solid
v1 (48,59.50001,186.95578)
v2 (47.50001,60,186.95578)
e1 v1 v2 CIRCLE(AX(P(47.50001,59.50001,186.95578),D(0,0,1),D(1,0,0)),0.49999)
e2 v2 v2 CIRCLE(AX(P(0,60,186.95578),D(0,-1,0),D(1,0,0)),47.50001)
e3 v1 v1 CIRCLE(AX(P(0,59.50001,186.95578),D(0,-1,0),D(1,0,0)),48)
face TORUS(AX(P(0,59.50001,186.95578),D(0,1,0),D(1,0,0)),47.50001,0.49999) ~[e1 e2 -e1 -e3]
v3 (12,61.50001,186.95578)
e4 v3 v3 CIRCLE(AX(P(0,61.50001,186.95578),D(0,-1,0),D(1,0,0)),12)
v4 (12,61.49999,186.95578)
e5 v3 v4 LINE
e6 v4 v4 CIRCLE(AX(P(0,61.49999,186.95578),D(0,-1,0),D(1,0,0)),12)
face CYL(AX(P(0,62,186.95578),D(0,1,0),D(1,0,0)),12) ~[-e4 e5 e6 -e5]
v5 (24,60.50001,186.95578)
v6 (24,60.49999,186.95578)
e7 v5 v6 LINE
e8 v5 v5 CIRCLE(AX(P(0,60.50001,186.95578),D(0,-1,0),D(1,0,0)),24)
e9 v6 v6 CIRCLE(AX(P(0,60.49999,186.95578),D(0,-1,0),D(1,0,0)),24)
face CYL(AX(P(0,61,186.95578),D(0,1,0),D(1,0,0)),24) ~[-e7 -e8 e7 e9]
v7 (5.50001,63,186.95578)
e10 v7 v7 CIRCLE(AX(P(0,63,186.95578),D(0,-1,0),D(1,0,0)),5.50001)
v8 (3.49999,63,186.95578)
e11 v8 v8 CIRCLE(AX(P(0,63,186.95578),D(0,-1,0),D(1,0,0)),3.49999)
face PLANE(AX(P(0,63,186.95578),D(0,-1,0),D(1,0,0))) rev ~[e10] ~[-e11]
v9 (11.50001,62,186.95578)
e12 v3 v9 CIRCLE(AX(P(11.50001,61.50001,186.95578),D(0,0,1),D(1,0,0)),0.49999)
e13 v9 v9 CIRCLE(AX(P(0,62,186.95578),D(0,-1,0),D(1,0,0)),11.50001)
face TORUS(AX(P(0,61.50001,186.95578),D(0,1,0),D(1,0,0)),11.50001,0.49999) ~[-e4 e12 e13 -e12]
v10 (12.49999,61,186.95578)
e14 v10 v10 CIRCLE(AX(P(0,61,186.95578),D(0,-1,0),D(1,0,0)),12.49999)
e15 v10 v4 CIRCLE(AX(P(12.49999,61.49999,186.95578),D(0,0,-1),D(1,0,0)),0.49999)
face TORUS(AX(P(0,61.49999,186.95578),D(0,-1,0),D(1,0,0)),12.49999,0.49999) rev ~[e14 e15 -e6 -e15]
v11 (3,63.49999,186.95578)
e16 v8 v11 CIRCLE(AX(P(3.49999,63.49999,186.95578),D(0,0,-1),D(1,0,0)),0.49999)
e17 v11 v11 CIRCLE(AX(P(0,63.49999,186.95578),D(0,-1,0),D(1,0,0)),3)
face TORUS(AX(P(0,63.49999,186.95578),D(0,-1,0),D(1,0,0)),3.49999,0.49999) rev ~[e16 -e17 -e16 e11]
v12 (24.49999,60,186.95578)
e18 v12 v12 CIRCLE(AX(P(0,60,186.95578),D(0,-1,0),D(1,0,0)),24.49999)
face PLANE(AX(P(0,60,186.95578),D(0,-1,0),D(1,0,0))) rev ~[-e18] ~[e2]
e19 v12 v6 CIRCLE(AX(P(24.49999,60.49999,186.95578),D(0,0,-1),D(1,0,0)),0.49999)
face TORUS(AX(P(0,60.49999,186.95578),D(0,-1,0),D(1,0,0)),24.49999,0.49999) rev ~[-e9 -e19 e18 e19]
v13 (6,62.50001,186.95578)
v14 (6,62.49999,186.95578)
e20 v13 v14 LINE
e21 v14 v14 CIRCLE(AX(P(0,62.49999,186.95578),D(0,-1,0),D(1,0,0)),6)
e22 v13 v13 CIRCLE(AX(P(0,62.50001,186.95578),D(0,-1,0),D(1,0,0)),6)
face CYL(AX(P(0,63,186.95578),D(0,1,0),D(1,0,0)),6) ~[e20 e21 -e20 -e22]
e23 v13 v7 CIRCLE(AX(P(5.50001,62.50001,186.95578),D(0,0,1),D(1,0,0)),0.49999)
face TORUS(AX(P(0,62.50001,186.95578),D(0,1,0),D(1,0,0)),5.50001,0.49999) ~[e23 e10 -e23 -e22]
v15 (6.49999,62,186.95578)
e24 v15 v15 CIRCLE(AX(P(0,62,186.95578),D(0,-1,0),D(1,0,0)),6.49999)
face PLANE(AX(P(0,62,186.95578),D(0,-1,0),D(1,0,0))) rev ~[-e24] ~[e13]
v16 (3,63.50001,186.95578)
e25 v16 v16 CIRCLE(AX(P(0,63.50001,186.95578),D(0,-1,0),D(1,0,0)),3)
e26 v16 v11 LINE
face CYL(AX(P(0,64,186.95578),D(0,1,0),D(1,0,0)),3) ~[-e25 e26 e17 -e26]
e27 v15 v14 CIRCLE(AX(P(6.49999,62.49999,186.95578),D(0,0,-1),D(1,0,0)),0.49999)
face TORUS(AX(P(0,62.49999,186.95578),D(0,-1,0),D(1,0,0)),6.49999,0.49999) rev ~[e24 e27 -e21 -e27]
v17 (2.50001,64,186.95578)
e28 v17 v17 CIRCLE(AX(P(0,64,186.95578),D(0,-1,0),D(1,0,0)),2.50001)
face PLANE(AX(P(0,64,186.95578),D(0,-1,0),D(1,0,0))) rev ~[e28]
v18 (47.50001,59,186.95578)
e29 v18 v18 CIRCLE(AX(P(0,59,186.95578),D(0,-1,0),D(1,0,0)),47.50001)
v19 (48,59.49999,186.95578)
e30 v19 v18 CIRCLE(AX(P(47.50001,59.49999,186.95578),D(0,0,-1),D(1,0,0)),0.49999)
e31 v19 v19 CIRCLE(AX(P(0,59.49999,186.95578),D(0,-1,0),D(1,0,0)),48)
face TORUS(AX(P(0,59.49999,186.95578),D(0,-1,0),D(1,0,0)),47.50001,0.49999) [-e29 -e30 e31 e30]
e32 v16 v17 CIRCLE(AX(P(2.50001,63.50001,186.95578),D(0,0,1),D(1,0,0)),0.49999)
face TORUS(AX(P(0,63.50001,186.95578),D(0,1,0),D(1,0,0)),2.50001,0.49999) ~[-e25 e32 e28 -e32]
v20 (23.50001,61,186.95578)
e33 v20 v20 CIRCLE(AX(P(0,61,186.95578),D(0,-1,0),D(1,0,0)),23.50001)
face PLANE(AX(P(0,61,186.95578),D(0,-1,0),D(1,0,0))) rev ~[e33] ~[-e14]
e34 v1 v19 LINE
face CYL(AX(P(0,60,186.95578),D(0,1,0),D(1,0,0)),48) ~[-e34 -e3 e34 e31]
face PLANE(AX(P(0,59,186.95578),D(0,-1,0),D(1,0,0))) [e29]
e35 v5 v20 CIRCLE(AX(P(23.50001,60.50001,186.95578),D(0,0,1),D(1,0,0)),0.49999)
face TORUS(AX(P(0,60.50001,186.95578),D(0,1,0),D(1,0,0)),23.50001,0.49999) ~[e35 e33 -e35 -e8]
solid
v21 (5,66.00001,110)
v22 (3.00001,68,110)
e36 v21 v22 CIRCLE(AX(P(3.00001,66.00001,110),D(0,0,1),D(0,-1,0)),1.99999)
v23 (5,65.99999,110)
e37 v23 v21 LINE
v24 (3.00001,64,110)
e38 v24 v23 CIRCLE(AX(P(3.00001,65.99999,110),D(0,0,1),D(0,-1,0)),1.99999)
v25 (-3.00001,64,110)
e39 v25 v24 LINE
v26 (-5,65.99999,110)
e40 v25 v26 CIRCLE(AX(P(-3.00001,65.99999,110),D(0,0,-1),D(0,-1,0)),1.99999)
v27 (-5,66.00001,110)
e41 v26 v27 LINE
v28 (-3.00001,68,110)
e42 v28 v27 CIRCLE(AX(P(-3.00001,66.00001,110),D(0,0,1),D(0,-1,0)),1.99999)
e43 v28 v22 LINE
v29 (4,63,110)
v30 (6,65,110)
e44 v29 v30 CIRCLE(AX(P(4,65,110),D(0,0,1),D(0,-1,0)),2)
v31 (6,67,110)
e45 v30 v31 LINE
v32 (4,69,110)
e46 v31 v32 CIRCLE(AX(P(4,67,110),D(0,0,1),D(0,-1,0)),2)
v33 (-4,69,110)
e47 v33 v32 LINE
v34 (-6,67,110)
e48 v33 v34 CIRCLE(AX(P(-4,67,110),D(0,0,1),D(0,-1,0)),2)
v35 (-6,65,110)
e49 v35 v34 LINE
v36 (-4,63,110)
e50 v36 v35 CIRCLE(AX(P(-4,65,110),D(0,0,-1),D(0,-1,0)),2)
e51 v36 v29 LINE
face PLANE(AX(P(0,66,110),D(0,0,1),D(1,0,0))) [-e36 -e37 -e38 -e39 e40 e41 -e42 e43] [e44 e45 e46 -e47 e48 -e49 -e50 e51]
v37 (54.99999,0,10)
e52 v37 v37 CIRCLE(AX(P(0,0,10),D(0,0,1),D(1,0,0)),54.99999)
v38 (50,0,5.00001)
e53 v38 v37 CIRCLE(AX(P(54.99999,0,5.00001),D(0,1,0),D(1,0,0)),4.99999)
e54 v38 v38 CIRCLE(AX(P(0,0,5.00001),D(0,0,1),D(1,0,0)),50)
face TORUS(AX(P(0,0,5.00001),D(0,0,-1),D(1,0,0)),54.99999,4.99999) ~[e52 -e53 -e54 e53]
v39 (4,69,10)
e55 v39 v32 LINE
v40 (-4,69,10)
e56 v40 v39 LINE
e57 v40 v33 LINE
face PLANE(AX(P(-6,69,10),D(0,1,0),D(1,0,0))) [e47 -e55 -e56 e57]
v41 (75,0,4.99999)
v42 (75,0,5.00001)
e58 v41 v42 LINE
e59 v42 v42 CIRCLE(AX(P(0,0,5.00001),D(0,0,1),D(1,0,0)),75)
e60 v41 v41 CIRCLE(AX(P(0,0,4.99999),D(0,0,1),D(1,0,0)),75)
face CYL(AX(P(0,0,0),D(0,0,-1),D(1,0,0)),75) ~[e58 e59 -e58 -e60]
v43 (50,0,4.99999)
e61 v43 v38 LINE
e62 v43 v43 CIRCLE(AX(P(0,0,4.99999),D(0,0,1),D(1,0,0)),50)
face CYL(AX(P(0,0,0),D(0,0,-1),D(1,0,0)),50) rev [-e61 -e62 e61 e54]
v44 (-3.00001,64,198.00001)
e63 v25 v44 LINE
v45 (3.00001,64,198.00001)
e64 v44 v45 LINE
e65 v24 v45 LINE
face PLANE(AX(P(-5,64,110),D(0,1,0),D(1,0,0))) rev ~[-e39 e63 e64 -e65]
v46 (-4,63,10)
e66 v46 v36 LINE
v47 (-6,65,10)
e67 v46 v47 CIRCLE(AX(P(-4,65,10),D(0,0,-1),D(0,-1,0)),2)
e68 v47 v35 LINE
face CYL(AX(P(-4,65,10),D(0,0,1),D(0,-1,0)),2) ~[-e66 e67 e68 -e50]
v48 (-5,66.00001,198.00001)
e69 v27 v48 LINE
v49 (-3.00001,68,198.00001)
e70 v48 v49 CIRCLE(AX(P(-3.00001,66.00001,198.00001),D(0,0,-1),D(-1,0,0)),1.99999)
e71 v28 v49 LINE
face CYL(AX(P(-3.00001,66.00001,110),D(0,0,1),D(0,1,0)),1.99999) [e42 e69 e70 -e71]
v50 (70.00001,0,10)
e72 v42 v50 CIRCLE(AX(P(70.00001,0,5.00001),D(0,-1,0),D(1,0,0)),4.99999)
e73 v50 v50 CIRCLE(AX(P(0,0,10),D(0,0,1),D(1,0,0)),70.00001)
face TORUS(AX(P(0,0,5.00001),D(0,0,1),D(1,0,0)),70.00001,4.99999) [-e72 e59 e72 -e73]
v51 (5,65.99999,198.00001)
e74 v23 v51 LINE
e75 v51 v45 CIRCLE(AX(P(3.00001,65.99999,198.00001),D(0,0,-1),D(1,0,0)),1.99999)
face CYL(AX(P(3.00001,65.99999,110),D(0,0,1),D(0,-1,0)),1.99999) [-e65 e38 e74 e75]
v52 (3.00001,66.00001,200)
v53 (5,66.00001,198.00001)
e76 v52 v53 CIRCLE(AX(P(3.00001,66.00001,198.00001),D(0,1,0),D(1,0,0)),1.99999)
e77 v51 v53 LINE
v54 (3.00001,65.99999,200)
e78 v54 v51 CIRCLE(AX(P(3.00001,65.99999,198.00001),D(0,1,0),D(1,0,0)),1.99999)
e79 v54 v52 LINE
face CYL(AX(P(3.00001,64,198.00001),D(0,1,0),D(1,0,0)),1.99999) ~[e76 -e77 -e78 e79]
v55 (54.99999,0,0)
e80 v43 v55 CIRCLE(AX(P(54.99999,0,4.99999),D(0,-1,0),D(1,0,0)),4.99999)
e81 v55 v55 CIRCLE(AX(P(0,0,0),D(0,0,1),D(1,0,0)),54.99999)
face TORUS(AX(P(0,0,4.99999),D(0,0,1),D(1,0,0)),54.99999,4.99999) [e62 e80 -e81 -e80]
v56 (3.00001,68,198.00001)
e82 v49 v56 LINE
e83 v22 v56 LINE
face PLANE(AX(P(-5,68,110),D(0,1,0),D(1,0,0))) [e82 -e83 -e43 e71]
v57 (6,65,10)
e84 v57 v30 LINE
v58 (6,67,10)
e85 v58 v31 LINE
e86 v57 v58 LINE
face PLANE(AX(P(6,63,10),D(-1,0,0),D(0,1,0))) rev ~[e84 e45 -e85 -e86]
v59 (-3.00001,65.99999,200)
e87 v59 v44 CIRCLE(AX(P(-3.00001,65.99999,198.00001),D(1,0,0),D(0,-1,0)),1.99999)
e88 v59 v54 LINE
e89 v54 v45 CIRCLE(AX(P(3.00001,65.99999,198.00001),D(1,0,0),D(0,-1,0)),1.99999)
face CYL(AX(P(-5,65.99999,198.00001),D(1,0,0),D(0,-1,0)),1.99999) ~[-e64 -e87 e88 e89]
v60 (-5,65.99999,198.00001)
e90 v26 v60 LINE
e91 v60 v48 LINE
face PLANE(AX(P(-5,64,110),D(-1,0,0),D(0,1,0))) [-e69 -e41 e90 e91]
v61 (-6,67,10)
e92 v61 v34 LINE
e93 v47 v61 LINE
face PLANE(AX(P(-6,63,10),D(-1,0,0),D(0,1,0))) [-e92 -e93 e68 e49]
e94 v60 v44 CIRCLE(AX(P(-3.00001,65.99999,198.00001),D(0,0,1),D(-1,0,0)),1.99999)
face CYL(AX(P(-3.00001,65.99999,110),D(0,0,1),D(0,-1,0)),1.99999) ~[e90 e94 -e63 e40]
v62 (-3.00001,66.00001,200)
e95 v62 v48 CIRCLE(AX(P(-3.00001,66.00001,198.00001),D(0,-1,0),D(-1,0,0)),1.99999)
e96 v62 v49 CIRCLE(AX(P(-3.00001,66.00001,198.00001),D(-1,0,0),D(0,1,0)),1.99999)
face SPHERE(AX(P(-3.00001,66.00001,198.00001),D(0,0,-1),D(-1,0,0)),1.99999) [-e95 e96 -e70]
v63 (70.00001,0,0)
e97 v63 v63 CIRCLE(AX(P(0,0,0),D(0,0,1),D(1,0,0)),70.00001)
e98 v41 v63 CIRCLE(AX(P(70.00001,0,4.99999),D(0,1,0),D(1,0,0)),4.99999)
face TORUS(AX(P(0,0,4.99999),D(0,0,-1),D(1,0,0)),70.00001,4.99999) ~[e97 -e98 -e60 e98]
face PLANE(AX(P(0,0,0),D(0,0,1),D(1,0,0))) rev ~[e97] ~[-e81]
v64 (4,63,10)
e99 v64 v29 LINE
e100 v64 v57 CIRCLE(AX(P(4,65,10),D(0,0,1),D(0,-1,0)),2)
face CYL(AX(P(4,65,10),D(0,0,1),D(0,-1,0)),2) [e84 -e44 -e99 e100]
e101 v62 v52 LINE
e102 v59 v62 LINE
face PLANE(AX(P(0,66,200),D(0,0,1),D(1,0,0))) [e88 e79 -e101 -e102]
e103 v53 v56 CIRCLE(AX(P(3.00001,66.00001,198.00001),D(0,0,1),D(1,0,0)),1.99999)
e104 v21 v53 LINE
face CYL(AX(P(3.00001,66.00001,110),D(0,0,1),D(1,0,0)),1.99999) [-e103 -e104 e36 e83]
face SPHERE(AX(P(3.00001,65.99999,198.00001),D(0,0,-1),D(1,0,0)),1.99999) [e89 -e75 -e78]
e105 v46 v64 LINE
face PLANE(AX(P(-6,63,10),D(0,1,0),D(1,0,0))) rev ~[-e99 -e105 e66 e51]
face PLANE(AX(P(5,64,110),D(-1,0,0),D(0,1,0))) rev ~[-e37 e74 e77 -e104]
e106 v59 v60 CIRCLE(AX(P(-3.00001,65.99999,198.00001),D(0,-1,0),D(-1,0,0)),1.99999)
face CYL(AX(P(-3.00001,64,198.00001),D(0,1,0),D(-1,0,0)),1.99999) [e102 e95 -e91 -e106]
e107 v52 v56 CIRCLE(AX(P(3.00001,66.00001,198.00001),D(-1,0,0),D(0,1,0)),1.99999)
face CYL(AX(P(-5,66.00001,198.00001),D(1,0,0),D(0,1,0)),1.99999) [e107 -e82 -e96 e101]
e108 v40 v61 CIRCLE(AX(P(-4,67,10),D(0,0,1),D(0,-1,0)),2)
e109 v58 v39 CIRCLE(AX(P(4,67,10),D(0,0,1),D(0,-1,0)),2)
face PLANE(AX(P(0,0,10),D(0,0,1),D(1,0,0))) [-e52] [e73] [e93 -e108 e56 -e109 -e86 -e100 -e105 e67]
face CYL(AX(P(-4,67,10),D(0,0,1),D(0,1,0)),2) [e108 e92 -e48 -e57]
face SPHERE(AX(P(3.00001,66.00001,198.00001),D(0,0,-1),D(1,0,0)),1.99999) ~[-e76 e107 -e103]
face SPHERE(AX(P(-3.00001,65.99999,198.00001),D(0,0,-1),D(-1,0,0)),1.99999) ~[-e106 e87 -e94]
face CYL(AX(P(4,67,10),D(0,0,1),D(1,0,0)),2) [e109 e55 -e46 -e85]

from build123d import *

# Parameters (mm, degrees)
F0_R      = 75
F0_R_2    = 50
F1_DEPTH  = 10
F2_R      = 4.99999
F3_W      = 12
F3_H      = 6
F4_DEPTH  = 100
F5_R      = 2
F6_W      = 10
F6_H      = 4
F7_DEPTH  = 90
F8_R      = 1.99999
F10_DEPTH = 1
F11_R     = 6
F12_DEPTH = 1
F13_R     = 12
F14_DEPTH = 1
F15_R     = 24
F16_DEPTH = 1
F17_R     = 48
F18_DEPTH = 1
F19_R     = 0.49999


# Not quite as in the source:
# - a fillet or chamfer is up to 0.001 mm smaller than in the source, because OpenCascade refuses the exact size


with BuildPart() as f1:
    # F0 (on Top) → F1 (new body)
    with BuildSketch(Plane.XY):
        Circle(F0_R)
        Circle(F0_R_2, mode=Mode.SUBTRACT)
    extrude(amount=F1_DEPTH)

    # F2 (radius 5 in the source; OpenCascade refuses exactly that, so slightly less here)
    f2_edges = [f1.edges().sort_by_distance(p)[0] for p in [
        (-75, 0, 10),
        (-50, 0, 10),
        (-75, 0, 0),
        (-50, 0, 0),
    ]]
    fillet(f2_edges, radius=F2_R)

    # F3 (on face) → F4 (join)
    with BuildSketch(Plane.XY.offset(10)):
        with Locations((0, 66)):
            Rectangle(F3_W, F3_H)
    extrude(amount=F4_DEPTH)

    # F5
    f5_edges = [f1.edges().sort_by_distance(p)[0] for p in [
        (6, 69, 60),
        (6, 63, 60),
        (-6, 69, 60),
        (-6, 63, 60),
    ]]
    fillet(f5_edges, radius=F5_R)

    # F6 (on face) → F7 (join)
    with BuildSketch(Plane.XY.offset(110)):
        with Locations((0, 66)):
            Rectangle(F6_W, F6_H)
    extrude(amount=F7_DEPTH)

    # F8 (radius 2 in the source; OpenCascade refuses exactly that, so slightly less here)
    f8_edges = [f1.edges().sort_by_distance(p)[0] for p in [
        (5, 64, 155),
        (5, 68, 155),
        (-5, 68, 155),
        (-5, 64, 155),
        (-5, 66, 200),
        (5, 66, 200),
        (0, 68, 200),
        (0, 64, 200),
    ]]
    fillet(f8_edges, radius=F8_R)


with BuildPart() as f10:
    # F9 (on face) → F10 (new body)
    with BuildSketch(Plane.XZ.offset(-64)):
        with BuildLine():
            ThreePointArc((-3, 186.9557797909), (0, 183.9557797909), (3, 186.9557797909))
            ThreePointArc((3, 186.9557797909), (0, 189.9557797909), (-3, 186.9557797909))
        make_face()
    extrude(amount=F10_DEPTH)

    # F11 (on face) → F12 (join)
    with BuildSketch(Plane.XZ.offset(-63)):
        with Locations((0, 186.9557797909)):
            Circle(F11_R)
    extrude(amount=F12_DEPTH)

    # F13 (on face) → F14 (join)
    with BuildSketch(Plane.XZ.offset(-62)):
        with Locations((0, 186.9557797909)):
            Circle(F13_R)
    extrude(amount=F14_DEPTH)

    # F15 (on face) → F16 (join)
    with BuildSketch(Plane.XZ.offset(-61)):
        with Locations((0, 186.9557797909)):
            Circle(F15_R)
    extrude(amount=F16_DEPTH)

    # F17 (on face) → F18 (join)
    with BuildSketch(Plane.XZ.offset(-60)):
        with Locations((0, 186.9557797909)):
            Circle(F17_R)
    extrude(amount=F18_DEPTH)

    # F19 (radius 0.5 in the source; OpenCascade refuses exactly that, so slightly less here)
    f19_edges = [f10.edges().sort_by_distance(p)[0] for p in [
        (-48, 59, 186.95578),
        (-48, 60, 186.95578),
        (-24, 60, 186.95578),
        (-24, 61, 186.95578),
        (-12, 61, 186.95578),
        (-12, 62, 186.95578),
        (-6, 62, 186.95578),
        (-6, 63, 186.95578),
        (3, 63, 186.95578),
        (3, 64, 186.95578),
    ]]
    fillet(f19_edges, radius=F19_R)


solid = Compound([f1.part, f10.part])
